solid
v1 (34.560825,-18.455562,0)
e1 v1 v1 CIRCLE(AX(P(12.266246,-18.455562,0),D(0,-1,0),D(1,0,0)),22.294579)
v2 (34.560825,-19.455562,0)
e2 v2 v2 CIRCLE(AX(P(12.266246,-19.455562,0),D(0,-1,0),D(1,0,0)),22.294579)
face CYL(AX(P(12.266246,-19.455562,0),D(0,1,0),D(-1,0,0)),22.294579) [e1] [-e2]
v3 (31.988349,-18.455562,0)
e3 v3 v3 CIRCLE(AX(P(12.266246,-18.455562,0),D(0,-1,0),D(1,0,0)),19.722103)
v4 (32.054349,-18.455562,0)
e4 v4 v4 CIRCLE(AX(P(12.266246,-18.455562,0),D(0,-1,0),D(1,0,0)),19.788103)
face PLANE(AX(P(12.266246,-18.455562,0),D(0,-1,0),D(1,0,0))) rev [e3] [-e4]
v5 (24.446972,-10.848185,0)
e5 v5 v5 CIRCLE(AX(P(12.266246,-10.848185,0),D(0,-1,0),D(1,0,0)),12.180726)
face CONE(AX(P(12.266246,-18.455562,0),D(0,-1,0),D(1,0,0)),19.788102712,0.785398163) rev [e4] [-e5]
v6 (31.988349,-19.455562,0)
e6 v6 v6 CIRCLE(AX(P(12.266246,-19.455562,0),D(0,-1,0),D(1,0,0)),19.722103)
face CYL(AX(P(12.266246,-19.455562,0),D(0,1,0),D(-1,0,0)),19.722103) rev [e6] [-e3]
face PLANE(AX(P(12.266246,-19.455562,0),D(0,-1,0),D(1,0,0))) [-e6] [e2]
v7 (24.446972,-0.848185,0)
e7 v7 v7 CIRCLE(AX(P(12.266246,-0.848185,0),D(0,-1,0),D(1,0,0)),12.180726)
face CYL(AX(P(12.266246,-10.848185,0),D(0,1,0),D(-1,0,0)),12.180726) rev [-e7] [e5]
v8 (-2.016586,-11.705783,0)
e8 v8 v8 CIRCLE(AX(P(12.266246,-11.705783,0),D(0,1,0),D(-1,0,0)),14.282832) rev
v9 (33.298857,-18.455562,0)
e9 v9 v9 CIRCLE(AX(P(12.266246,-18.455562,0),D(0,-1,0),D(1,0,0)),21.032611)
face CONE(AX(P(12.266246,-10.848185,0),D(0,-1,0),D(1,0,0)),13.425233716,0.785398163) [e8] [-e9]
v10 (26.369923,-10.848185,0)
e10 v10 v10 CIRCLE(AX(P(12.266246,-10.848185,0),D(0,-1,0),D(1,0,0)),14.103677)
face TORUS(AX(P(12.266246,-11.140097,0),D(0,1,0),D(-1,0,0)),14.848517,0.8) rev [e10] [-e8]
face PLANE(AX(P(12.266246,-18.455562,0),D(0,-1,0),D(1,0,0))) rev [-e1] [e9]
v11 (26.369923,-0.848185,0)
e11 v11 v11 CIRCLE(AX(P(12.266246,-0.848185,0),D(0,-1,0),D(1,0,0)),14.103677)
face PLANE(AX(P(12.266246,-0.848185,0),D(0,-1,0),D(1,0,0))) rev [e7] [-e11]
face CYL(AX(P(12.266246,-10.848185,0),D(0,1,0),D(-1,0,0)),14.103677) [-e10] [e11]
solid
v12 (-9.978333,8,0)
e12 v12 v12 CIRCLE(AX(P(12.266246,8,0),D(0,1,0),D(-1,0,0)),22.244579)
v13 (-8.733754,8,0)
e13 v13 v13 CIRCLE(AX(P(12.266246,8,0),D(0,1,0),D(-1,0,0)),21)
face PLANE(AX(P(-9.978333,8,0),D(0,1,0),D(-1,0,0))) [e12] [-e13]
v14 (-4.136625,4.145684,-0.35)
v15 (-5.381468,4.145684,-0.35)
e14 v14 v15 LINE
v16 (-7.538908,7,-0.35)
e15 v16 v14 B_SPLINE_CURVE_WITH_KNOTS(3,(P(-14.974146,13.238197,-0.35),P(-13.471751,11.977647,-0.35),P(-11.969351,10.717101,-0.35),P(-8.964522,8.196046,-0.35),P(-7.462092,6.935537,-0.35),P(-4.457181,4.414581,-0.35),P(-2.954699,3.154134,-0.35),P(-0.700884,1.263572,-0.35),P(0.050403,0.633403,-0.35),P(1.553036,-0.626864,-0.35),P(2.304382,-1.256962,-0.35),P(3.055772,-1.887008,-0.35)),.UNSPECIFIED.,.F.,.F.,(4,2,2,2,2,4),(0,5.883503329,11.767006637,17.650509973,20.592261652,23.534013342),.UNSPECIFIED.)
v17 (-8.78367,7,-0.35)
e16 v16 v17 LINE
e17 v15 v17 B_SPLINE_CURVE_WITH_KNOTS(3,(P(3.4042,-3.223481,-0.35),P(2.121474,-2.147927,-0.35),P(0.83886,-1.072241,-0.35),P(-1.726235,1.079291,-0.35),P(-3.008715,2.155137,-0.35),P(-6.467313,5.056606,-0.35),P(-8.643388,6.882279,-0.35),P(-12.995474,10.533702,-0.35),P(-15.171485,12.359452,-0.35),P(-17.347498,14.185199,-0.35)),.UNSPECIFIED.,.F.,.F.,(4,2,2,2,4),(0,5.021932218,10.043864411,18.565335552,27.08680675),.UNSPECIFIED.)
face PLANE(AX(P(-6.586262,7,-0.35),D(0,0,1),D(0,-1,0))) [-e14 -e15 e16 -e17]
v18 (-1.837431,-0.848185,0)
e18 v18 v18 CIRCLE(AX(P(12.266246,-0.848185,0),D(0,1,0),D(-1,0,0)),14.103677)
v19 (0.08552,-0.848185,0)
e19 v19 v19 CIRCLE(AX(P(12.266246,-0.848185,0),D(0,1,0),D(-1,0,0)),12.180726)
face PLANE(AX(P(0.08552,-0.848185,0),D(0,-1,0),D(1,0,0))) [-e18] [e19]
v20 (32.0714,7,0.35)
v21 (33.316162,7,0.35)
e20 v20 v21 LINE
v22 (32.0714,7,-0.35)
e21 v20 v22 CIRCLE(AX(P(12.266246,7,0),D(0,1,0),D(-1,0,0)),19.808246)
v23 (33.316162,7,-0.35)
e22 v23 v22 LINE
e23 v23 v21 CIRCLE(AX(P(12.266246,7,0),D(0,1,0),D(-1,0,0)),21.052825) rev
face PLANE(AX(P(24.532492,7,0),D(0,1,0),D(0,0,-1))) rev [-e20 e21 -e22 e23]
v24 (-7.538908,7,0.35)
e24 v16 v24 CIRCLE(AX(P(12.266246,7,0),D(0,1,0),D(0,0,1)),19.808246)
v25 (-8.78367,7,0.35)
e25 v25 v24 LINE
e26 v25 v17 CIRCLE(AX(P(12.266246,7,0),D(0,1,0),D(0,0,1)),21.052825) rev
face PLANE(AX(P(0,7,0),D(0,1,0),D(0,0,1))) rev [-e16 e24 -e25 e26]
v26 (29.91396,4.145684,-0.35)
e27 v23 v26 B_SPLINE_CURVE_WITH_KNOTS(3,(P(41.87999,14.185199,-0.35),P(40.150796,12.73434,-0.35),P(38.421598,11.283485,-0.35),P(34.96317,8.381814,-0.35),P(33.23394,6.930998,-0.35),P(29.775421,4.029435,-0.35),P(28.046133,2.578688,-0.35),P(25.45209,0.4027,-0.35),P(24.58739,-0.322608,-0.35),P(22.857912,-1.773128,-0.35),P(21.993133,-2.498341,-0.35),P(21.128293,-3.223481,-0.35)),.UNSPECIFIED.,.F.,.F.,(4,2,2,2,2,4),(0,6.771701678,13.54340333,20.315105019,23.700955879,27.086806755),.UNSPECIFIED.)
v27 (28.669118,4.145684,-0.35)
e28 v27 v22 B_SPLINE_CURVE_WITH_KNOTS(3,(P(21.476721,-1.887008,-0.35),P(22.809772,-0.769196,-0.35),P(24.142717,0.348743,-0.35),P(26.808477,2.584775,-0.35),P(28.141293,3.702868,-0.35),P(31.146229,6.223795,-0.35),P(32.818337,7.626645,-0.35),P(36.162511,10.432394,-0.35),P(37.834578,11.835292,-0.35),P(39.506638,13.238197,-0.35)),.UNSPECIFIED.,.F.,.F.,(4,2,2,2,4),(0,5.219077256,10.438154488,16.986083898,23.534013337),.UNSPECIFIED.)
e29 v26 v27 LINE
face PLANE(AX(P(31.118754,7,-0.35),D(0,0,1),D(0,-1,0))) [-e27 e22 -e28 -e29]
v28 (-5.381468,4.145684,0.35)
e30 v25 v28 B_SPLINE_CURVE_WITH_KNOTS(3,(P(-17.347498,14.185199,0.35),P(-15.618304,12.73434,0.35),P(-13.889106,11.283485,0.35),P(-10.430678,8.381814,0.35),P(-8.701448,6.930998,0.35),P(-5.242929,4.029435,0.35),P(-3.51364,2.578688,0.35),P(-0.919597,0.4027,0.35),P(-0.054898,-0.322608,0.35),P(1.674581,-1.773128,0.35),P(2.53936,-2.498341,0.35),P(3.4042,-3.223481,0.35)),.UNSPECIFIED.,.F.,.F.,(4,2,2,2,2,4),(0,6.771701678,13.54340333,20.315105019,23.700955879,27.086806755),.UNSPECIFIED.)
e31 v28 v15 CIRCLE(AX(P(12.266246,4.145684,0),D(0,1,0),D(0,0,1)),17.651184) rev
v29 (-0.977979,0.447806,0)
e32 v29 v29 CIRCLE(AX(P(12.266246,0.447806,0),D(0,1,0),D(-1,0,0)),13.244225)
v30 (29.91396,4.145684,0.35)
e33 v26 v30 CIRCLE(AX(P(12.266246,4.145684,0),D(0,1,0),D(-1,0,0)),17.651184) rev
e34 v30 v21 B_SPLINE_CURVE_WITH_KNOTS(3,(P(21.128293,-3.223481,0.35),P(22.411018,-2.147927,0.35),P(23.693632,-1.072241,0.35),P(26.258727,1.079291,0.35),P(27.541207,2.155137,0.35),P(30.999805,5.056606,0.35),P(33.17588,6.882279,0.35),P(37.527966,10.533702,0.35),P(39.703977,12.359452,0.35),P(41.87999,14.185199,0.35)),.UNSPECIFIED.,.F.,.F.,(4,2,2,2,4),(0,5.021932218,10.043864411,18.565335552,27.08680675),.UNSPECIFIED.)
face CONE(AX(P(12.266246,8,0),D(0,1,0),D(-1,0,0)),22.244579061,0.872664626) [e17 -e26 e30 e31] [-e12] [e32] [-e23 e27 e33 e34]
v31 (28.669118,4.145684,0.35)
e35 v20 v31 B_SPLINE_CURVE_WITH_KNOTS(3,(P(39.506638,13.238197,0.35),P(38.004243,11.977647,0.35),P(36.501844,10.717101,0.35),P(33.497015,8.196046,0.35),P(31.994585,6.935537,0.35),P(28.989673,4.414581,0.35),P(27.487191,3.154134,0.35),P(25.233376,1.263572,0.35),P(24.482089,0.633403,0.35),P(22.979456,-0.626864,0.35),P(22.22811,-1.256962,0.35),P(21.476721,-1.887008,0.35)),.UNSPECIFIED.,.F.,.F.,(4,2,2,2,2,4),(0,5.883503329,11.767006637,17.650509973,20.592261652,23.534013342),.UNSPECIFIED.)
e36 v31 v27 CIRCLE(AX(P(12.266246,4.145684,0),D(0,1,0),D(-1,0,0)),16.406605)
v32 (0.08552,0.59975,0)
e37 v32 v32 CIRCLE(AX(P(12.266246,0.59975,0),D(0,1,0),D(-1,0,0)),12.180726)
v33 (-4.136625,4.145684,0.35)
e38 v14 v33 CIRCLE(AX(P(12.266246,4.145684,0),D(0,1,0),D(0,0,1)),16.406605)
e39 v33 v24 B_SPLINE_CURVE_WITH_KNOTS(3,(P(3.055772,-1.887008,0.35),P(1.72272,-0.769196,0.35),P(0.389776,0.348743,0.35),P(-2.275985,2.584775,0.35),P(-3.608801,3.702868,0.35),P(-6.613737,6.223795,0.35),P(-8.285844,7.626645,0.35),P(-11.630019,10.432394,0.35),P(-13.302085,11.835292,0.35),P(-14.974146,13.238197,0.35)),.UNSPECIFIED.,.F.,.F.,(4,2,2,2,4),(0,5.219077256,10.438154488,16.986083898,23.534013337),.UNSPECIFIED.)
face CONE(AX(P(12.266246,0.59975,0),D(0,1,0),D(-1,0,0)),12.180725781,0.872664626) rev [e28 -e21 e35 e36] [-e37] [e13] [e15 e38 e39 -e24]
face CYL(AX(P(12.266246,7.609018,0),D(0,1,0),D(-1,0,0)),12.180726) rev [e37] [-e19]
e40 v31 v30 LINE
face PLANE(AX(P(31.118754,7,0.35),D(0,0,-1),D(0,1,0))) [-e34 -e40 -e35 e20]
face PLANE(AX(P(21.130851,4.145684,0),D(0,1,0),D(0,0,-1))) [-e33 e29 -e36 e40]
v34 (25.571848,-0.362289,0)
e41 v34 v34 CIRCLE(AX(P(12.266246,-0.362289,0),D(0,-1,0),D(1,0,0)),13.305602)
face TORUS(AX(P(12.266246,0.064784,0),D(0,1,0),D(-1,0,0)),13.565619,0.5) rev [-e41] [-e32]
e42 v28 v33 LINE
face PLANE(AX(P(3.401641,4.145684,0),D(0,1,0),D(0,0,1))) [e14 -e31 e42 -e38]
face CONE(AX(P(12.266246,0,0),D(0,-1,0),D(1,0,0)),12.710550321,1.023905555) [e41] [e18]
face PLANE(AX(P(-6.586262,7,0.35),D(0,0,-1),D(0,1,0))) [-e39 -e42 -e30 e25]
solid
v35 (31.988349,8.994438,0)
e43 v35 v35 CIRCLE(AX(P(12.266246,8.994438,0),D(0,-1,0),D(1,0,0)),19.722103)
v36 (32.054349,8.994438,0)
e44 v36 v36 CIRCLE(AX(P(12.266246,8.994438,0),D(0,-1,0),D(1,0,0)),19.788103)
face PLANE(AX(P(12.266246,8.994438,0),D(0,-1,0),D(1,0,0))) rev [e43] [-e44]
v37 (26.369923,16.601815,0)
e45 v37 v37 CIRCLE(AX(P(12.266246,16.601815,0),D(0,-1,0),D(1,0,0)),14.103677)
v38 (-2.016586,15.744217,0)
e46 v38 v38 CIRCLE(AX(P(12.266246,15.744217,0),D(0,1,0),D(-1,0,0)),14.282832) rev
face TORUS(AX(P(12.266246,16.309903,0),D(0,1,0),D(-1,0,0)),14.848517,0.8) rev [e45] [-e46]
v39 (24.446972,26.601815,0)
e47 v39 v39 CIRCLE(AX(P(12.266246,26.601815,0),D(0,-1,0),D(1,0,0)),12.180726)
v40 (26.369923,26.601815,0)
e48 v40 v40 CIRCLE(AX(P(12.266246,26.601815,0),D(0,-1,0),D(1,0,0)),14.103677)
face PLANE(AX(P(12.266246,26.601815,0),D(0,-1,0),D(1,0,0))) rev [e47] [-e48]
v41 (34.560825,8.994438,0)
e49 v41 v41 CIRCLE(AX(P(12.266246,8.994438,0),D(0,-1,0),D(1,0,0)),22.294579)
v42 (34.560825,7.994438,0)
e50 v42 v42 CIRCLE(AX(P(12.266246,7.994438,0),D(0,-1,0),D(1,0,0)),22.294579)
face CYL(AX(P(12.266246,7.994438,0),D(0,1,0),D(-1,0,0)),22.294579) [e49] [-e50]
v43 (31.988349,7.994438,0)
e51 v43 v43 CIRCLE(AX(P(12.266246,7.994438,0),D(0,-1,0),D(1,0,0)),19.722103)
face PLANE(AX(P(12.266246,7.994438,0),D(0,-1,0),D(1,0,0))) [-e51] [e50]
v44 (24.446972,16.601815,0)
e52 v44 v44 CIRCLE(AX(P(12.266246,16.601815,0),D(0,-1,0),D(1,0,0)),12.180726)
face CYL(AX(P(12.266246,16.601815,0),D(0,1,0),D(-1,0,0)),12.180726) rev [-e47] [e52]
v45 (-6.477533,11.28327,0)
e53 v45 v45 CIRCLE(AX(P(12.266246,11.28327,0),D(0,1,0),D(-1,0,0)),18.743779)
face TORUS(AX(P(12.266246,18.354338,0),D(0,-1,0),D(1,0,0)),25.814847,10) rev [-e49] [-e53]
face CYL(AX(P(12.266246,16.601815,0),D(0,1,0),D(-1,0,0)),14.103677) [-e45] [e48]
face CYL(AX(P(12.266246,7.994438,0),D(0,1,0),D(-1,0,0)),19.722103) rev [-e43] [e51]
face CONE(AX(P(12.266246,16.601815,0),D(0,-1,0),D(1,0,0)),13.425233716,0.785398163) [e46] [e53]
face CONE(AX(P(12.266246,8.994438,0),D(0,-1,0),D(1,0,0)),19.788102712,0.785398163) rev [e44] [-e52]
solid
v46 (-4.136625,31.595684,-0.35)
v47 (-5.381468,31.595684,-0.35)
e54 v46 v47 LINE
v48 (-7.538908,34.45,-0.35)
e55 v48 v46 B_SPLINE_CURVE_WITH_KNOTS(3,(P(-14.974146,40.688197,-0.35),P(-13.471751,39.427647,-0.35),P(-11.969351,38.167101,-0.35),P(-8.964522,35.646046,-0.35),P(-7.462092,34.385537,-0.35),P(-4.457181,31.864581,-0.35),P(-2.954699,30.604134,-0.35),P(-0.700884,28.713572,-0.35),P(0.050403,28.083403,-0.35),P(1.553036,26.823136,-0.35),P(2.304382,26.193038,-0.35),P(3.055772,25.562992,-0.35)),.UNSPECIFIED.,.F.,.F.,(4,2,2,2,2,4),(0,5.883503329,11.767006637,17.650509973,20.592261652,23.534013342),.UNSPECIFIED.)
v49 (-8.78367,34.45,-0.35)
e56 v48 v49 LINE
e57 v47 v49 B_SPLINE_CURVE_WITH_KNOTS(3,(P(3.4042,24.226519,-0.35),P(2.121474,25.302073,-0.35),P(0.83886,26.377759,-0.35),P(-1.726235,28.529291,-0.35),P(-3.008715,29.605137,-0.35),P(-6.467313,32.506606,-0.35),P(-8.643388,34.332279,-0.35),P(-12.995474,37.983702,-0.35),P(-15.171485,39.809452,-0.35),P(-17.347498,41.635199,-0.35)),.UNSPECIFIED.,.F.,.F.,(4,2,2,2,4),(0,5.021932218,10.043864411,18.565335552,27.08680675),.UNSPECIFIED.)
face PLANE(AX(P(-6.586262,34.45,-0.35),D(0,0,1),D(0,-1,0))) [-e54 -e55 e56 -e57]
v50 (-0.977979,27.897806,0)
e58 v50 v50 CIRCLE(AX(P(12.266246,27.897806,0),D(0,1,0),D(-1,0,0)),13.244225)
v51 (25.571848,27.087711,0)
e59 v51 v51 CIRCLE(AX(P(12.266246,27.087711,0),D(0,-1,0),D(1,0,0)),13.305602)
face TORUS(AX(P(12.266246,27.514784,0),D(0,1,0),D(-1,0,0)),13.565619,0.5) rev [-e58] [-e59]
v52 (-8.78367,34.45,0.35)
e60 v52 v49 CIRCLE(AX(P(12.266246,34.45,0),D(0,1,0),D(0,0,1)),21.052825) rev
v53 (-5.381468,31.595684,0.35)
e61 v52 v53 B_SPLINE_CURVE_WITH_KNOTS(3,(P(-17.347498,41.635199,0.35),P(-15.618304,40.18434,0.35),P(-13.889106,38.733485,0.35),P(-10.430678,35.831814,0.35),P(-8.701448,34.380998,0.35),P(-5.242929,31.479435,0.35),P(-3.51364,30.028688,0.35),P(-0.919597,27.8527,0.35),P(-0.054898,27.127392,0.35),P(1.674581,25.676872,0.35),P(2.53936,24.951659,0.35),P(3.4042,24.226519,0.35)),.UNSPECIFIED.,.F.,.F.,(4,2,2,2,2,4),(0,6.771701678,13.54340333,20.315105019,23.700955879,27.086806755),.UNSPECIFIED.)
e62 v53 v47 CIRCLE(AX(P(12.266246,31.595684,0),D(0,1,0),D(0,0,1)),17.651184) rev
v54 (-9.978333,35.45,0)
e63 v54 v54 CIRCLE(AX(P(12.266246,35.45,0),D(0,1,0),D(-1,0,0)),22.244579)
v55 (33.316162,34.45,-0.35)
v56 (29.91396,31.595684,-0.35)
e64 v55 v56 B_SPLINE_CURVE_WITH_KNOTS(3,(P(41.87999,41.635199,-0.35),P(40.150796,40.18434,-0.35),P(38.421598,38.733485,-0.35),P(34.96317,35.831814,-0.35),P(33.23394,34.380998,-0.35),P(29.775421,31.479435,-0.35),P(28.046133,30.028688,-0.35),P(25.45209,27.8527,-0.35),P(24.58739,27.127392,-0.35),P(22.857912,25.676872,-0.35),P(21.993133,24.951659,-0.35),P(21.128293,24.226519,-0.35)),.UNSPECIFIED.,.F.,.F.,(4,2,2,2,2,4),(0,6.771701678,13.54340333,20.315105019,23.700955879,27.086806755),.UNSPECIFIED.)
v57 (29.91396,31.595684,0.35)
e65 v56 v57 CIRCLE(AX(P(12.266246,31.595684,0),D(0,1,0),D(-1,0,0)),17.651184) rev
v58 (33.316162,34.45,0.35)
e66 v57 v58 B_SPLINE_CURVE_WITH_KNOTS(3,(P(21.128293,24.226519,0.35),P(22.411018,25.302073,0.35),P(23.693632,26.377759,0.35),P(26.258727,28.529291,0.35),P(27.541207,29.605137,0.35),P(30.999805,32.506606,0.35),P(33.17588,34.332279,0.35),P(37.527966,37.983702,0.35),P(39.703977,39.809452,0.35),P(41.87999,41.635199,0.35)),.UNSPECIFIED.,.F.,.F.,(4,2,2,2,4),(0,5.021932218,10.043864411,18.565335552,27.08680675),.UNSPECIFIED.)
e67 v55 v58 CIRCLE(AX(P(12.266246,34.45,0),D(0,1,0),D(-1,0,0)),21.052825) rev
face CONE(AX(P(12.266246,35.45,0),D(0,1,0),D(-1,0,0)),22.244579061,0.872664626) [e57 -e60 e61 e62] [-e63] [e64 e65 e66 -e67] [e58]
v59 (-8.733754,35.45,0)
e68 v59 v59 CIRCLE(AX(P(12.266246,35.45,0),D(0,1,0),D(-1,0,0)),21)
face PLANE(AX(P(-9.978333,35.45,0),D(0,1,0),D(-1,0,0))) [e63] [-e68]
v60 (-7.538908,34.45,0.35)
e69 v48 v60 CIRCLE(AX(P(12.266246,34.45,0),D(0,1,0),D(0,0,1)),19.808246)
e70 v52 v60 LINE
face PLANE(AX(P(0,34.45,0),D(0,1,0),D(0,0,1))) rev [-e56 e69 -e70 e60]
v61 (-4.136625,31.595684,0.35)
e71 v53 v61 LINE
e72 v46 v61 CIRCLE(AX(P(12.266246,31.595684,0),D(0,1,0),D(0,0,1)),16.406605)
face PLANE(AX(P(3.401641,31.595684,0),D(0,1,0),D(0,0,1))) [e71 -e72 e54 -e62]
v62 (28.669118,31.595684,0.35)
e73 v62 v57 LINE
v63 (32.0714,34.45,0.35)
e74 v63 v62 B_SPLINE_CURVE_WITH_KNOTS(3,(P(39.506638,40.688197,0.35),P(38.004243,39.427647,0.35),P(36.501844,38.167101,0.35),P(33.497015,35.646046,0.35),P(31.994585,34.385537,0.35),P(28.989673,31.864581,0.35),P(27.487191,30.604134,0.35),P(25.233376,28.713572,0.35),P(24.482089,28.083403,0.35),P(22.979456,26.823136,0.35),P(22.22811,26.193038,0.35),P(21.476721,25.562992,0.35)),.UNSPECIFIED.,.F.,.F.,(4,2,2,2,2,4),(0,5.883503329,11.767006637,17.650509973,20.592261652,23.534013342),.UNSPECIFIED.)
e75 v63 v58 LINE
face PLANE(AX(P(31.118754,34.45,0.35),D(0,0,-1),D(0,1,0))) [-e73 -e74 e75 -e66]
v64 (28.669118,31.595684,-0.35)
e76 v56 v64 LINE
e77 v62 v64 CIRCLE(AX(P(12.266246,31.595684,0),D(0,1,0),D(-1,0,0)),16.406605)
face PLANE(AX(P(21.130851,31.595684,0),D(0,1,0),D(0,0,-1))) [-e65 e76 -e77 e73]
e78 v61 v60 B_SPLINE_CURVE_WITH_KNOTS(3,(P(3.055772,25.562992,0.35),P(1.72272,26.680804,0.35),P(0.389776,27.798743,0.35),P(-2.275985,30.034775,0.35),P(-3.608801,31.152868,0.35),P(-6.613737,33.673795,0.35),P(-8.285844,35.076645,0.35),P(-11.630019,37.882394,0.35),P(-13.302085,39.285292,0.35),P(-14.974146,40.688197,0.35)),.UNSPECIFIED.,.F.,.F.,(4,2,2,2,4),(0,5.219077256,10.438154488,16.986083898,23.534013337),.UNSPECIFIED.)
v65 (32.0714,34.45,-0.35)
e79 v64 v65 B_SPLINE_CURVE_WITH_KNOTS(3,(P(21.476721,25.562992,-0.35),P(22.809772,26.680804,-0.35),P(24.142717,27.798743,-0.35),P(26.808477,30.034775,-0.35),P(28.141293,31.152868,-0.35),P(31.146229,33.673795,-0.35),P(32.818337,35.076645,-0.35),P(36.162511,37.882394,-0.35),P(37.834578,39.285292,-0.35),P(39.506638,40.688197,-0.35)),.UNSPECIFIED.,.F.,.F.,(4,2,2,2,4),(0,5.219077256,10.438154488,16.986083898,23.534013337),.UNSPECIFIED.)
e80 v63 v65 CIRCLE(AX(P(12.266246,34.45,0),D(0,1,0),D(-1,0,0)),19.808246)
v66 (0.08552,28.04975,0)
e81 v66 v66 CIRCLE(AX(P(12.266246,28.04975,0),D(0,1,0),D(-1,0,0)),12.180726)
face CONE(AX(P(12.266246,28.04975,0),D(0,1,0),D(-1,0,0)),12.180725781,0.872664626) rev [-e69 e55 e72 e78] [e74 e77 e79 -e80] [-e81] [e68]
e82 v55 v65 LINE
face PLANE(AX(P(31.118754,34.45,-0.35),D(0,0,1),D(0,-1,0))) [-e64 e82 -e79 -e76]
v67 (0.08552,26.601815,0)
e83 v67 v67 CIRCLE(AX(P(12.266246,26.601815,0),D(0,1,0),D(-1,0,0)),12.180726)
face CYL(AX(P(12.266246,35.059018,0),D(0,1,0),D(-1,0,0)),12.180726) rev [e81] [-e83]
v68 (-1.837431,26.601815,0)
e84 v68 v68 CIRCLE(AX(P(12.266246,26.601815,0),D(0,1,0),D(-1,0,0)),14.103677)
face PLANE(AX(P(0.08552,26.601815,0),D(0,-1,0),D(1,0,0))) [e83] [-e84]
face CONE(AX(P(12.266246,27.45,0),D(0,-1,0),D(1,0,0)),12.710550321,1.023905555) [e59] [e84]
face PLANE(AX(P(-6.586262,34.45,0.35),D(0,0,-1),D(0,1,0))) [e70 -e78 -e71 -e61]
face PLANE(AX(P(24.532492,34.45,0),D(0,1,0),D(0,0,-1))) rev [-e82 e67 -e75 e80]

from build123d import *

# Parameters (mm, degrees)
ACTIVE_FILLET_R     = 0.5
SKETCH11_R          = 14.103676921920666
SKETCH11_R_2        = 12.180725781348816
COLLAR_DEPTH        = 10
PASSIVE_FILLET_R    = 0.8
SKETCH15_R          = 22.29457906148835
SKETCH15_R_2        = 19.722102711916126
BOSS_EXTRUDE2_DEPTH = 1
SKETCH18_W          = 3.727866184859466
SKETCH18_H          = 0.7
CIRPATTERN1_COUNT   = 2
FILLET1_R           = 10


with BuildPart() as part:
    # Sketch1 → Main Active (revolve)
    with BuildSketch(Plane.XY):
        Polygon((-0.44430417046757187, 0), (-9.97833291122136, 8), (-8.733753849733018, 8), (0.08552036891816808, 0.5997502558785777), (0.08552036891816808, -0.8481847341285212), (-1.8374307716536824, -0.8481847341285211), align=None)
    revolve(axis=Axis((12.266246150266982, 7.609018032819944, 0), (1.1e-16, -1, 0)))

    # Active fillet
    active_fillet_edges = [part.edges().sort_by_distance(p)[0] for p in [
        (24.976796471001535, 3.23e-15, -1.56e-15),
    ]]
    fillet(active_fillet_edges, radius=ACTIVE_FILLET_R)

    # Cut-Sweep2: sweep along a path in Sketch19
    with BuildLine(Plane(origin=(-0.18357578046802644, -0.2187770958860591, 2e-17), x_dir=(-0.7660444431189819, 0.6427876096865347, 0), z_dir=(-0.6427876096865347, -0.7660444431189819, 0))) as cut_sweep2_path:
        Line((11.230423528864234, 1.22e-15), (6.789896246932316, 1.18e-15))
    # Sketch18 → Cut-Sweep2 (sweep, cut)
    with BuildSketch(Plane(origin=(-8e-16, 7.000000000000001, 0), x_dir=(1, 1.1e-16, 0), z_dir=(-1.1e-16, 1, 0))):
        with Locations((-8.450194980560173, 0)):
            Rectangle(SKETCH18_W, SKETCH18_H)
    cut_sweep2 = sweep(path=cut_sweep2_path.line, mode=Mode.SUBTRACT)

    # CirPattern1: Cut-Sweep2 ×2 about axis
    cirpattern1_axis = Axis((12.266246150266982, 8.000000000000002, 0), (-1.1e-16, 1, 0))
    for i in range(1, CIRPATTERN1_COUNT):
        add(cut_sweep2.rotate(cirpattern1_axis, i * 360 / CIRPATTERN1_COUNT), mode=Mode.SUBTRACT)


with BuildPart() as body_2:
    # Sketch11 → collar (new body)
    with BuildSketch(Plane.XZ.offset(0.848184734128521)):
        with Locations((12.266246150266984, 0)):
            Circle(SKETCH11_R)
        with Locations((12.266246150266984, 0)):
            Circle(SKETCH11_R_2, mode=Mode.SUBTRACT)
    extrude(amount=COLLAR_DEPTH)

    # Sketch14 → Passive Element (revolve)
    with BuildSketch(Plane.XY, mode=Mode.PRIVATE) as passive_element_sk:
        Polygon((-1.1589875659701498, -10.848184734128521), (-8.766364496537454, -18.455561664695857), (-7.521856561649136, -18.45556166469586), (0.08552036891816897, -10.848184734128521), align=None)
    revolve(passive_element_sk.sketch.rotate(Axis((12.266246150266984, -19.969844330252183, 0), (-1.2e-16, 1, 0)), 180), axis=Axis((12.266246150266984, -19.969844330252183, 0), (-1.2e-16, 1, 0)))

    # Passive Fillet
    # the kernel refuses this fillet: 0.8 mm, written as the material it adds along each edge
    with BuildSketch(Plane(origin=(12.266246150266982, -10.84818473412852, 0), x_dir=(1, 1.3e-16, 1.2e-16), z_dir=(-1.2e-16, 0, 1))) as passive_fillet_piece_1:
        with BuildLine():
            CenterArc((14.848517187625331, -0.2919126214897238), PASSIVE_FILLET_R, 158.5991389184753, 66.40086108152457)
            Line((14.282831762676091, -0.8575980464389606), (14.271518054177106, -0.8689117549379458))
            Line((14.271518054177106, -0.8689117549379458), (13.413920007738147, -0.01131370849898516))
            Line((13.413920007738147, -0.01131370849898516), (13.425233716237132, 0.01600000000000001))
            ThreePointArc((13.425233716237132, 0.01600000000000001), (13.764455319078897, 0.01599999999999997), (14.08878011660657, 0.00583825242979499))
            Line((14.08878011660657, 0.00583825242979499), (14.103676921920664, -9e-17))
        make_face()
    revolve(axis=Axis((12.266246150266982, -10.84818473412852, 0), (-1.2e-16, 1, 0)))

    # Sketch15 → Boss-Extrude2 (add)
    with BuildSketch(Plane.XZ.offset(18.455561664695857)):
        with Locations((12.266246150266984, 0)):
            Circle(SKETCH15_R)
        with Locations((12.266246150266984, 0)):
            Circle(SKETCH15_R_2, mode=Mode.SUBTRACT)
    extrude(amount=BOSS_EXTRUDE2_DEPTH)


with BuildPart() as body_3:
    # Body-Move/Copy2: read off the stored shape, not the designer's step
    # Body-Move/Copy2: copy of body 2
    add(body_2.part.moved(Location((0, 27.45, 0))))

    # Fillet1
    # the kernel refuses this fillet: 10 mm, written as the material it adds along each edge
    with BuildSketch(Plane(origin=(12.266246150266984, 8.994438335304146, 0), x_dir=(1, 1.7e-16, 1.2e-16), z_dir=(-1.2e-16, 0, 1))) as fillet1_piece_1:
        with BuildLine():
            CenterArc((25.81484706108966, 9.359899209445736), FILLET1_R, 224.9999999999999, 24.388666535893208)
            Line((18.743779249224175, 2.2888313975802714), (18.602357892986863, 2.147410041342962))
            Line((18.602357892986863, 2.147410041342962), (20.89118929056713, -0.14142135623731097))
            Line((20.89118929056713, -0.14142135623731097), (21.03261064680444, -0.20000000000000107))
            ThreePointArc((21.03261064680444, -0.20000000000000107), (21.663594854146393, -0.20000000000000118), (22.224173701496323, -0.1871979841889184))
            Line((22.224173701496323, -0.1871979841889184), (22.294579061488346, -3.77e-15))
        make_face()
    revolve(axis=Axis((12.266246150266984, 8.994438335304146, 0), (-1.2e-16, 1, 0)))


with BuildPart() as body_4:
    # Body-Move_Copy2 2: copy of part
    add(part.part.moved(Location((0, 27.45, 0))))


solid = Compound([part.part, body_2.part, body_3.part, body_4.part])
